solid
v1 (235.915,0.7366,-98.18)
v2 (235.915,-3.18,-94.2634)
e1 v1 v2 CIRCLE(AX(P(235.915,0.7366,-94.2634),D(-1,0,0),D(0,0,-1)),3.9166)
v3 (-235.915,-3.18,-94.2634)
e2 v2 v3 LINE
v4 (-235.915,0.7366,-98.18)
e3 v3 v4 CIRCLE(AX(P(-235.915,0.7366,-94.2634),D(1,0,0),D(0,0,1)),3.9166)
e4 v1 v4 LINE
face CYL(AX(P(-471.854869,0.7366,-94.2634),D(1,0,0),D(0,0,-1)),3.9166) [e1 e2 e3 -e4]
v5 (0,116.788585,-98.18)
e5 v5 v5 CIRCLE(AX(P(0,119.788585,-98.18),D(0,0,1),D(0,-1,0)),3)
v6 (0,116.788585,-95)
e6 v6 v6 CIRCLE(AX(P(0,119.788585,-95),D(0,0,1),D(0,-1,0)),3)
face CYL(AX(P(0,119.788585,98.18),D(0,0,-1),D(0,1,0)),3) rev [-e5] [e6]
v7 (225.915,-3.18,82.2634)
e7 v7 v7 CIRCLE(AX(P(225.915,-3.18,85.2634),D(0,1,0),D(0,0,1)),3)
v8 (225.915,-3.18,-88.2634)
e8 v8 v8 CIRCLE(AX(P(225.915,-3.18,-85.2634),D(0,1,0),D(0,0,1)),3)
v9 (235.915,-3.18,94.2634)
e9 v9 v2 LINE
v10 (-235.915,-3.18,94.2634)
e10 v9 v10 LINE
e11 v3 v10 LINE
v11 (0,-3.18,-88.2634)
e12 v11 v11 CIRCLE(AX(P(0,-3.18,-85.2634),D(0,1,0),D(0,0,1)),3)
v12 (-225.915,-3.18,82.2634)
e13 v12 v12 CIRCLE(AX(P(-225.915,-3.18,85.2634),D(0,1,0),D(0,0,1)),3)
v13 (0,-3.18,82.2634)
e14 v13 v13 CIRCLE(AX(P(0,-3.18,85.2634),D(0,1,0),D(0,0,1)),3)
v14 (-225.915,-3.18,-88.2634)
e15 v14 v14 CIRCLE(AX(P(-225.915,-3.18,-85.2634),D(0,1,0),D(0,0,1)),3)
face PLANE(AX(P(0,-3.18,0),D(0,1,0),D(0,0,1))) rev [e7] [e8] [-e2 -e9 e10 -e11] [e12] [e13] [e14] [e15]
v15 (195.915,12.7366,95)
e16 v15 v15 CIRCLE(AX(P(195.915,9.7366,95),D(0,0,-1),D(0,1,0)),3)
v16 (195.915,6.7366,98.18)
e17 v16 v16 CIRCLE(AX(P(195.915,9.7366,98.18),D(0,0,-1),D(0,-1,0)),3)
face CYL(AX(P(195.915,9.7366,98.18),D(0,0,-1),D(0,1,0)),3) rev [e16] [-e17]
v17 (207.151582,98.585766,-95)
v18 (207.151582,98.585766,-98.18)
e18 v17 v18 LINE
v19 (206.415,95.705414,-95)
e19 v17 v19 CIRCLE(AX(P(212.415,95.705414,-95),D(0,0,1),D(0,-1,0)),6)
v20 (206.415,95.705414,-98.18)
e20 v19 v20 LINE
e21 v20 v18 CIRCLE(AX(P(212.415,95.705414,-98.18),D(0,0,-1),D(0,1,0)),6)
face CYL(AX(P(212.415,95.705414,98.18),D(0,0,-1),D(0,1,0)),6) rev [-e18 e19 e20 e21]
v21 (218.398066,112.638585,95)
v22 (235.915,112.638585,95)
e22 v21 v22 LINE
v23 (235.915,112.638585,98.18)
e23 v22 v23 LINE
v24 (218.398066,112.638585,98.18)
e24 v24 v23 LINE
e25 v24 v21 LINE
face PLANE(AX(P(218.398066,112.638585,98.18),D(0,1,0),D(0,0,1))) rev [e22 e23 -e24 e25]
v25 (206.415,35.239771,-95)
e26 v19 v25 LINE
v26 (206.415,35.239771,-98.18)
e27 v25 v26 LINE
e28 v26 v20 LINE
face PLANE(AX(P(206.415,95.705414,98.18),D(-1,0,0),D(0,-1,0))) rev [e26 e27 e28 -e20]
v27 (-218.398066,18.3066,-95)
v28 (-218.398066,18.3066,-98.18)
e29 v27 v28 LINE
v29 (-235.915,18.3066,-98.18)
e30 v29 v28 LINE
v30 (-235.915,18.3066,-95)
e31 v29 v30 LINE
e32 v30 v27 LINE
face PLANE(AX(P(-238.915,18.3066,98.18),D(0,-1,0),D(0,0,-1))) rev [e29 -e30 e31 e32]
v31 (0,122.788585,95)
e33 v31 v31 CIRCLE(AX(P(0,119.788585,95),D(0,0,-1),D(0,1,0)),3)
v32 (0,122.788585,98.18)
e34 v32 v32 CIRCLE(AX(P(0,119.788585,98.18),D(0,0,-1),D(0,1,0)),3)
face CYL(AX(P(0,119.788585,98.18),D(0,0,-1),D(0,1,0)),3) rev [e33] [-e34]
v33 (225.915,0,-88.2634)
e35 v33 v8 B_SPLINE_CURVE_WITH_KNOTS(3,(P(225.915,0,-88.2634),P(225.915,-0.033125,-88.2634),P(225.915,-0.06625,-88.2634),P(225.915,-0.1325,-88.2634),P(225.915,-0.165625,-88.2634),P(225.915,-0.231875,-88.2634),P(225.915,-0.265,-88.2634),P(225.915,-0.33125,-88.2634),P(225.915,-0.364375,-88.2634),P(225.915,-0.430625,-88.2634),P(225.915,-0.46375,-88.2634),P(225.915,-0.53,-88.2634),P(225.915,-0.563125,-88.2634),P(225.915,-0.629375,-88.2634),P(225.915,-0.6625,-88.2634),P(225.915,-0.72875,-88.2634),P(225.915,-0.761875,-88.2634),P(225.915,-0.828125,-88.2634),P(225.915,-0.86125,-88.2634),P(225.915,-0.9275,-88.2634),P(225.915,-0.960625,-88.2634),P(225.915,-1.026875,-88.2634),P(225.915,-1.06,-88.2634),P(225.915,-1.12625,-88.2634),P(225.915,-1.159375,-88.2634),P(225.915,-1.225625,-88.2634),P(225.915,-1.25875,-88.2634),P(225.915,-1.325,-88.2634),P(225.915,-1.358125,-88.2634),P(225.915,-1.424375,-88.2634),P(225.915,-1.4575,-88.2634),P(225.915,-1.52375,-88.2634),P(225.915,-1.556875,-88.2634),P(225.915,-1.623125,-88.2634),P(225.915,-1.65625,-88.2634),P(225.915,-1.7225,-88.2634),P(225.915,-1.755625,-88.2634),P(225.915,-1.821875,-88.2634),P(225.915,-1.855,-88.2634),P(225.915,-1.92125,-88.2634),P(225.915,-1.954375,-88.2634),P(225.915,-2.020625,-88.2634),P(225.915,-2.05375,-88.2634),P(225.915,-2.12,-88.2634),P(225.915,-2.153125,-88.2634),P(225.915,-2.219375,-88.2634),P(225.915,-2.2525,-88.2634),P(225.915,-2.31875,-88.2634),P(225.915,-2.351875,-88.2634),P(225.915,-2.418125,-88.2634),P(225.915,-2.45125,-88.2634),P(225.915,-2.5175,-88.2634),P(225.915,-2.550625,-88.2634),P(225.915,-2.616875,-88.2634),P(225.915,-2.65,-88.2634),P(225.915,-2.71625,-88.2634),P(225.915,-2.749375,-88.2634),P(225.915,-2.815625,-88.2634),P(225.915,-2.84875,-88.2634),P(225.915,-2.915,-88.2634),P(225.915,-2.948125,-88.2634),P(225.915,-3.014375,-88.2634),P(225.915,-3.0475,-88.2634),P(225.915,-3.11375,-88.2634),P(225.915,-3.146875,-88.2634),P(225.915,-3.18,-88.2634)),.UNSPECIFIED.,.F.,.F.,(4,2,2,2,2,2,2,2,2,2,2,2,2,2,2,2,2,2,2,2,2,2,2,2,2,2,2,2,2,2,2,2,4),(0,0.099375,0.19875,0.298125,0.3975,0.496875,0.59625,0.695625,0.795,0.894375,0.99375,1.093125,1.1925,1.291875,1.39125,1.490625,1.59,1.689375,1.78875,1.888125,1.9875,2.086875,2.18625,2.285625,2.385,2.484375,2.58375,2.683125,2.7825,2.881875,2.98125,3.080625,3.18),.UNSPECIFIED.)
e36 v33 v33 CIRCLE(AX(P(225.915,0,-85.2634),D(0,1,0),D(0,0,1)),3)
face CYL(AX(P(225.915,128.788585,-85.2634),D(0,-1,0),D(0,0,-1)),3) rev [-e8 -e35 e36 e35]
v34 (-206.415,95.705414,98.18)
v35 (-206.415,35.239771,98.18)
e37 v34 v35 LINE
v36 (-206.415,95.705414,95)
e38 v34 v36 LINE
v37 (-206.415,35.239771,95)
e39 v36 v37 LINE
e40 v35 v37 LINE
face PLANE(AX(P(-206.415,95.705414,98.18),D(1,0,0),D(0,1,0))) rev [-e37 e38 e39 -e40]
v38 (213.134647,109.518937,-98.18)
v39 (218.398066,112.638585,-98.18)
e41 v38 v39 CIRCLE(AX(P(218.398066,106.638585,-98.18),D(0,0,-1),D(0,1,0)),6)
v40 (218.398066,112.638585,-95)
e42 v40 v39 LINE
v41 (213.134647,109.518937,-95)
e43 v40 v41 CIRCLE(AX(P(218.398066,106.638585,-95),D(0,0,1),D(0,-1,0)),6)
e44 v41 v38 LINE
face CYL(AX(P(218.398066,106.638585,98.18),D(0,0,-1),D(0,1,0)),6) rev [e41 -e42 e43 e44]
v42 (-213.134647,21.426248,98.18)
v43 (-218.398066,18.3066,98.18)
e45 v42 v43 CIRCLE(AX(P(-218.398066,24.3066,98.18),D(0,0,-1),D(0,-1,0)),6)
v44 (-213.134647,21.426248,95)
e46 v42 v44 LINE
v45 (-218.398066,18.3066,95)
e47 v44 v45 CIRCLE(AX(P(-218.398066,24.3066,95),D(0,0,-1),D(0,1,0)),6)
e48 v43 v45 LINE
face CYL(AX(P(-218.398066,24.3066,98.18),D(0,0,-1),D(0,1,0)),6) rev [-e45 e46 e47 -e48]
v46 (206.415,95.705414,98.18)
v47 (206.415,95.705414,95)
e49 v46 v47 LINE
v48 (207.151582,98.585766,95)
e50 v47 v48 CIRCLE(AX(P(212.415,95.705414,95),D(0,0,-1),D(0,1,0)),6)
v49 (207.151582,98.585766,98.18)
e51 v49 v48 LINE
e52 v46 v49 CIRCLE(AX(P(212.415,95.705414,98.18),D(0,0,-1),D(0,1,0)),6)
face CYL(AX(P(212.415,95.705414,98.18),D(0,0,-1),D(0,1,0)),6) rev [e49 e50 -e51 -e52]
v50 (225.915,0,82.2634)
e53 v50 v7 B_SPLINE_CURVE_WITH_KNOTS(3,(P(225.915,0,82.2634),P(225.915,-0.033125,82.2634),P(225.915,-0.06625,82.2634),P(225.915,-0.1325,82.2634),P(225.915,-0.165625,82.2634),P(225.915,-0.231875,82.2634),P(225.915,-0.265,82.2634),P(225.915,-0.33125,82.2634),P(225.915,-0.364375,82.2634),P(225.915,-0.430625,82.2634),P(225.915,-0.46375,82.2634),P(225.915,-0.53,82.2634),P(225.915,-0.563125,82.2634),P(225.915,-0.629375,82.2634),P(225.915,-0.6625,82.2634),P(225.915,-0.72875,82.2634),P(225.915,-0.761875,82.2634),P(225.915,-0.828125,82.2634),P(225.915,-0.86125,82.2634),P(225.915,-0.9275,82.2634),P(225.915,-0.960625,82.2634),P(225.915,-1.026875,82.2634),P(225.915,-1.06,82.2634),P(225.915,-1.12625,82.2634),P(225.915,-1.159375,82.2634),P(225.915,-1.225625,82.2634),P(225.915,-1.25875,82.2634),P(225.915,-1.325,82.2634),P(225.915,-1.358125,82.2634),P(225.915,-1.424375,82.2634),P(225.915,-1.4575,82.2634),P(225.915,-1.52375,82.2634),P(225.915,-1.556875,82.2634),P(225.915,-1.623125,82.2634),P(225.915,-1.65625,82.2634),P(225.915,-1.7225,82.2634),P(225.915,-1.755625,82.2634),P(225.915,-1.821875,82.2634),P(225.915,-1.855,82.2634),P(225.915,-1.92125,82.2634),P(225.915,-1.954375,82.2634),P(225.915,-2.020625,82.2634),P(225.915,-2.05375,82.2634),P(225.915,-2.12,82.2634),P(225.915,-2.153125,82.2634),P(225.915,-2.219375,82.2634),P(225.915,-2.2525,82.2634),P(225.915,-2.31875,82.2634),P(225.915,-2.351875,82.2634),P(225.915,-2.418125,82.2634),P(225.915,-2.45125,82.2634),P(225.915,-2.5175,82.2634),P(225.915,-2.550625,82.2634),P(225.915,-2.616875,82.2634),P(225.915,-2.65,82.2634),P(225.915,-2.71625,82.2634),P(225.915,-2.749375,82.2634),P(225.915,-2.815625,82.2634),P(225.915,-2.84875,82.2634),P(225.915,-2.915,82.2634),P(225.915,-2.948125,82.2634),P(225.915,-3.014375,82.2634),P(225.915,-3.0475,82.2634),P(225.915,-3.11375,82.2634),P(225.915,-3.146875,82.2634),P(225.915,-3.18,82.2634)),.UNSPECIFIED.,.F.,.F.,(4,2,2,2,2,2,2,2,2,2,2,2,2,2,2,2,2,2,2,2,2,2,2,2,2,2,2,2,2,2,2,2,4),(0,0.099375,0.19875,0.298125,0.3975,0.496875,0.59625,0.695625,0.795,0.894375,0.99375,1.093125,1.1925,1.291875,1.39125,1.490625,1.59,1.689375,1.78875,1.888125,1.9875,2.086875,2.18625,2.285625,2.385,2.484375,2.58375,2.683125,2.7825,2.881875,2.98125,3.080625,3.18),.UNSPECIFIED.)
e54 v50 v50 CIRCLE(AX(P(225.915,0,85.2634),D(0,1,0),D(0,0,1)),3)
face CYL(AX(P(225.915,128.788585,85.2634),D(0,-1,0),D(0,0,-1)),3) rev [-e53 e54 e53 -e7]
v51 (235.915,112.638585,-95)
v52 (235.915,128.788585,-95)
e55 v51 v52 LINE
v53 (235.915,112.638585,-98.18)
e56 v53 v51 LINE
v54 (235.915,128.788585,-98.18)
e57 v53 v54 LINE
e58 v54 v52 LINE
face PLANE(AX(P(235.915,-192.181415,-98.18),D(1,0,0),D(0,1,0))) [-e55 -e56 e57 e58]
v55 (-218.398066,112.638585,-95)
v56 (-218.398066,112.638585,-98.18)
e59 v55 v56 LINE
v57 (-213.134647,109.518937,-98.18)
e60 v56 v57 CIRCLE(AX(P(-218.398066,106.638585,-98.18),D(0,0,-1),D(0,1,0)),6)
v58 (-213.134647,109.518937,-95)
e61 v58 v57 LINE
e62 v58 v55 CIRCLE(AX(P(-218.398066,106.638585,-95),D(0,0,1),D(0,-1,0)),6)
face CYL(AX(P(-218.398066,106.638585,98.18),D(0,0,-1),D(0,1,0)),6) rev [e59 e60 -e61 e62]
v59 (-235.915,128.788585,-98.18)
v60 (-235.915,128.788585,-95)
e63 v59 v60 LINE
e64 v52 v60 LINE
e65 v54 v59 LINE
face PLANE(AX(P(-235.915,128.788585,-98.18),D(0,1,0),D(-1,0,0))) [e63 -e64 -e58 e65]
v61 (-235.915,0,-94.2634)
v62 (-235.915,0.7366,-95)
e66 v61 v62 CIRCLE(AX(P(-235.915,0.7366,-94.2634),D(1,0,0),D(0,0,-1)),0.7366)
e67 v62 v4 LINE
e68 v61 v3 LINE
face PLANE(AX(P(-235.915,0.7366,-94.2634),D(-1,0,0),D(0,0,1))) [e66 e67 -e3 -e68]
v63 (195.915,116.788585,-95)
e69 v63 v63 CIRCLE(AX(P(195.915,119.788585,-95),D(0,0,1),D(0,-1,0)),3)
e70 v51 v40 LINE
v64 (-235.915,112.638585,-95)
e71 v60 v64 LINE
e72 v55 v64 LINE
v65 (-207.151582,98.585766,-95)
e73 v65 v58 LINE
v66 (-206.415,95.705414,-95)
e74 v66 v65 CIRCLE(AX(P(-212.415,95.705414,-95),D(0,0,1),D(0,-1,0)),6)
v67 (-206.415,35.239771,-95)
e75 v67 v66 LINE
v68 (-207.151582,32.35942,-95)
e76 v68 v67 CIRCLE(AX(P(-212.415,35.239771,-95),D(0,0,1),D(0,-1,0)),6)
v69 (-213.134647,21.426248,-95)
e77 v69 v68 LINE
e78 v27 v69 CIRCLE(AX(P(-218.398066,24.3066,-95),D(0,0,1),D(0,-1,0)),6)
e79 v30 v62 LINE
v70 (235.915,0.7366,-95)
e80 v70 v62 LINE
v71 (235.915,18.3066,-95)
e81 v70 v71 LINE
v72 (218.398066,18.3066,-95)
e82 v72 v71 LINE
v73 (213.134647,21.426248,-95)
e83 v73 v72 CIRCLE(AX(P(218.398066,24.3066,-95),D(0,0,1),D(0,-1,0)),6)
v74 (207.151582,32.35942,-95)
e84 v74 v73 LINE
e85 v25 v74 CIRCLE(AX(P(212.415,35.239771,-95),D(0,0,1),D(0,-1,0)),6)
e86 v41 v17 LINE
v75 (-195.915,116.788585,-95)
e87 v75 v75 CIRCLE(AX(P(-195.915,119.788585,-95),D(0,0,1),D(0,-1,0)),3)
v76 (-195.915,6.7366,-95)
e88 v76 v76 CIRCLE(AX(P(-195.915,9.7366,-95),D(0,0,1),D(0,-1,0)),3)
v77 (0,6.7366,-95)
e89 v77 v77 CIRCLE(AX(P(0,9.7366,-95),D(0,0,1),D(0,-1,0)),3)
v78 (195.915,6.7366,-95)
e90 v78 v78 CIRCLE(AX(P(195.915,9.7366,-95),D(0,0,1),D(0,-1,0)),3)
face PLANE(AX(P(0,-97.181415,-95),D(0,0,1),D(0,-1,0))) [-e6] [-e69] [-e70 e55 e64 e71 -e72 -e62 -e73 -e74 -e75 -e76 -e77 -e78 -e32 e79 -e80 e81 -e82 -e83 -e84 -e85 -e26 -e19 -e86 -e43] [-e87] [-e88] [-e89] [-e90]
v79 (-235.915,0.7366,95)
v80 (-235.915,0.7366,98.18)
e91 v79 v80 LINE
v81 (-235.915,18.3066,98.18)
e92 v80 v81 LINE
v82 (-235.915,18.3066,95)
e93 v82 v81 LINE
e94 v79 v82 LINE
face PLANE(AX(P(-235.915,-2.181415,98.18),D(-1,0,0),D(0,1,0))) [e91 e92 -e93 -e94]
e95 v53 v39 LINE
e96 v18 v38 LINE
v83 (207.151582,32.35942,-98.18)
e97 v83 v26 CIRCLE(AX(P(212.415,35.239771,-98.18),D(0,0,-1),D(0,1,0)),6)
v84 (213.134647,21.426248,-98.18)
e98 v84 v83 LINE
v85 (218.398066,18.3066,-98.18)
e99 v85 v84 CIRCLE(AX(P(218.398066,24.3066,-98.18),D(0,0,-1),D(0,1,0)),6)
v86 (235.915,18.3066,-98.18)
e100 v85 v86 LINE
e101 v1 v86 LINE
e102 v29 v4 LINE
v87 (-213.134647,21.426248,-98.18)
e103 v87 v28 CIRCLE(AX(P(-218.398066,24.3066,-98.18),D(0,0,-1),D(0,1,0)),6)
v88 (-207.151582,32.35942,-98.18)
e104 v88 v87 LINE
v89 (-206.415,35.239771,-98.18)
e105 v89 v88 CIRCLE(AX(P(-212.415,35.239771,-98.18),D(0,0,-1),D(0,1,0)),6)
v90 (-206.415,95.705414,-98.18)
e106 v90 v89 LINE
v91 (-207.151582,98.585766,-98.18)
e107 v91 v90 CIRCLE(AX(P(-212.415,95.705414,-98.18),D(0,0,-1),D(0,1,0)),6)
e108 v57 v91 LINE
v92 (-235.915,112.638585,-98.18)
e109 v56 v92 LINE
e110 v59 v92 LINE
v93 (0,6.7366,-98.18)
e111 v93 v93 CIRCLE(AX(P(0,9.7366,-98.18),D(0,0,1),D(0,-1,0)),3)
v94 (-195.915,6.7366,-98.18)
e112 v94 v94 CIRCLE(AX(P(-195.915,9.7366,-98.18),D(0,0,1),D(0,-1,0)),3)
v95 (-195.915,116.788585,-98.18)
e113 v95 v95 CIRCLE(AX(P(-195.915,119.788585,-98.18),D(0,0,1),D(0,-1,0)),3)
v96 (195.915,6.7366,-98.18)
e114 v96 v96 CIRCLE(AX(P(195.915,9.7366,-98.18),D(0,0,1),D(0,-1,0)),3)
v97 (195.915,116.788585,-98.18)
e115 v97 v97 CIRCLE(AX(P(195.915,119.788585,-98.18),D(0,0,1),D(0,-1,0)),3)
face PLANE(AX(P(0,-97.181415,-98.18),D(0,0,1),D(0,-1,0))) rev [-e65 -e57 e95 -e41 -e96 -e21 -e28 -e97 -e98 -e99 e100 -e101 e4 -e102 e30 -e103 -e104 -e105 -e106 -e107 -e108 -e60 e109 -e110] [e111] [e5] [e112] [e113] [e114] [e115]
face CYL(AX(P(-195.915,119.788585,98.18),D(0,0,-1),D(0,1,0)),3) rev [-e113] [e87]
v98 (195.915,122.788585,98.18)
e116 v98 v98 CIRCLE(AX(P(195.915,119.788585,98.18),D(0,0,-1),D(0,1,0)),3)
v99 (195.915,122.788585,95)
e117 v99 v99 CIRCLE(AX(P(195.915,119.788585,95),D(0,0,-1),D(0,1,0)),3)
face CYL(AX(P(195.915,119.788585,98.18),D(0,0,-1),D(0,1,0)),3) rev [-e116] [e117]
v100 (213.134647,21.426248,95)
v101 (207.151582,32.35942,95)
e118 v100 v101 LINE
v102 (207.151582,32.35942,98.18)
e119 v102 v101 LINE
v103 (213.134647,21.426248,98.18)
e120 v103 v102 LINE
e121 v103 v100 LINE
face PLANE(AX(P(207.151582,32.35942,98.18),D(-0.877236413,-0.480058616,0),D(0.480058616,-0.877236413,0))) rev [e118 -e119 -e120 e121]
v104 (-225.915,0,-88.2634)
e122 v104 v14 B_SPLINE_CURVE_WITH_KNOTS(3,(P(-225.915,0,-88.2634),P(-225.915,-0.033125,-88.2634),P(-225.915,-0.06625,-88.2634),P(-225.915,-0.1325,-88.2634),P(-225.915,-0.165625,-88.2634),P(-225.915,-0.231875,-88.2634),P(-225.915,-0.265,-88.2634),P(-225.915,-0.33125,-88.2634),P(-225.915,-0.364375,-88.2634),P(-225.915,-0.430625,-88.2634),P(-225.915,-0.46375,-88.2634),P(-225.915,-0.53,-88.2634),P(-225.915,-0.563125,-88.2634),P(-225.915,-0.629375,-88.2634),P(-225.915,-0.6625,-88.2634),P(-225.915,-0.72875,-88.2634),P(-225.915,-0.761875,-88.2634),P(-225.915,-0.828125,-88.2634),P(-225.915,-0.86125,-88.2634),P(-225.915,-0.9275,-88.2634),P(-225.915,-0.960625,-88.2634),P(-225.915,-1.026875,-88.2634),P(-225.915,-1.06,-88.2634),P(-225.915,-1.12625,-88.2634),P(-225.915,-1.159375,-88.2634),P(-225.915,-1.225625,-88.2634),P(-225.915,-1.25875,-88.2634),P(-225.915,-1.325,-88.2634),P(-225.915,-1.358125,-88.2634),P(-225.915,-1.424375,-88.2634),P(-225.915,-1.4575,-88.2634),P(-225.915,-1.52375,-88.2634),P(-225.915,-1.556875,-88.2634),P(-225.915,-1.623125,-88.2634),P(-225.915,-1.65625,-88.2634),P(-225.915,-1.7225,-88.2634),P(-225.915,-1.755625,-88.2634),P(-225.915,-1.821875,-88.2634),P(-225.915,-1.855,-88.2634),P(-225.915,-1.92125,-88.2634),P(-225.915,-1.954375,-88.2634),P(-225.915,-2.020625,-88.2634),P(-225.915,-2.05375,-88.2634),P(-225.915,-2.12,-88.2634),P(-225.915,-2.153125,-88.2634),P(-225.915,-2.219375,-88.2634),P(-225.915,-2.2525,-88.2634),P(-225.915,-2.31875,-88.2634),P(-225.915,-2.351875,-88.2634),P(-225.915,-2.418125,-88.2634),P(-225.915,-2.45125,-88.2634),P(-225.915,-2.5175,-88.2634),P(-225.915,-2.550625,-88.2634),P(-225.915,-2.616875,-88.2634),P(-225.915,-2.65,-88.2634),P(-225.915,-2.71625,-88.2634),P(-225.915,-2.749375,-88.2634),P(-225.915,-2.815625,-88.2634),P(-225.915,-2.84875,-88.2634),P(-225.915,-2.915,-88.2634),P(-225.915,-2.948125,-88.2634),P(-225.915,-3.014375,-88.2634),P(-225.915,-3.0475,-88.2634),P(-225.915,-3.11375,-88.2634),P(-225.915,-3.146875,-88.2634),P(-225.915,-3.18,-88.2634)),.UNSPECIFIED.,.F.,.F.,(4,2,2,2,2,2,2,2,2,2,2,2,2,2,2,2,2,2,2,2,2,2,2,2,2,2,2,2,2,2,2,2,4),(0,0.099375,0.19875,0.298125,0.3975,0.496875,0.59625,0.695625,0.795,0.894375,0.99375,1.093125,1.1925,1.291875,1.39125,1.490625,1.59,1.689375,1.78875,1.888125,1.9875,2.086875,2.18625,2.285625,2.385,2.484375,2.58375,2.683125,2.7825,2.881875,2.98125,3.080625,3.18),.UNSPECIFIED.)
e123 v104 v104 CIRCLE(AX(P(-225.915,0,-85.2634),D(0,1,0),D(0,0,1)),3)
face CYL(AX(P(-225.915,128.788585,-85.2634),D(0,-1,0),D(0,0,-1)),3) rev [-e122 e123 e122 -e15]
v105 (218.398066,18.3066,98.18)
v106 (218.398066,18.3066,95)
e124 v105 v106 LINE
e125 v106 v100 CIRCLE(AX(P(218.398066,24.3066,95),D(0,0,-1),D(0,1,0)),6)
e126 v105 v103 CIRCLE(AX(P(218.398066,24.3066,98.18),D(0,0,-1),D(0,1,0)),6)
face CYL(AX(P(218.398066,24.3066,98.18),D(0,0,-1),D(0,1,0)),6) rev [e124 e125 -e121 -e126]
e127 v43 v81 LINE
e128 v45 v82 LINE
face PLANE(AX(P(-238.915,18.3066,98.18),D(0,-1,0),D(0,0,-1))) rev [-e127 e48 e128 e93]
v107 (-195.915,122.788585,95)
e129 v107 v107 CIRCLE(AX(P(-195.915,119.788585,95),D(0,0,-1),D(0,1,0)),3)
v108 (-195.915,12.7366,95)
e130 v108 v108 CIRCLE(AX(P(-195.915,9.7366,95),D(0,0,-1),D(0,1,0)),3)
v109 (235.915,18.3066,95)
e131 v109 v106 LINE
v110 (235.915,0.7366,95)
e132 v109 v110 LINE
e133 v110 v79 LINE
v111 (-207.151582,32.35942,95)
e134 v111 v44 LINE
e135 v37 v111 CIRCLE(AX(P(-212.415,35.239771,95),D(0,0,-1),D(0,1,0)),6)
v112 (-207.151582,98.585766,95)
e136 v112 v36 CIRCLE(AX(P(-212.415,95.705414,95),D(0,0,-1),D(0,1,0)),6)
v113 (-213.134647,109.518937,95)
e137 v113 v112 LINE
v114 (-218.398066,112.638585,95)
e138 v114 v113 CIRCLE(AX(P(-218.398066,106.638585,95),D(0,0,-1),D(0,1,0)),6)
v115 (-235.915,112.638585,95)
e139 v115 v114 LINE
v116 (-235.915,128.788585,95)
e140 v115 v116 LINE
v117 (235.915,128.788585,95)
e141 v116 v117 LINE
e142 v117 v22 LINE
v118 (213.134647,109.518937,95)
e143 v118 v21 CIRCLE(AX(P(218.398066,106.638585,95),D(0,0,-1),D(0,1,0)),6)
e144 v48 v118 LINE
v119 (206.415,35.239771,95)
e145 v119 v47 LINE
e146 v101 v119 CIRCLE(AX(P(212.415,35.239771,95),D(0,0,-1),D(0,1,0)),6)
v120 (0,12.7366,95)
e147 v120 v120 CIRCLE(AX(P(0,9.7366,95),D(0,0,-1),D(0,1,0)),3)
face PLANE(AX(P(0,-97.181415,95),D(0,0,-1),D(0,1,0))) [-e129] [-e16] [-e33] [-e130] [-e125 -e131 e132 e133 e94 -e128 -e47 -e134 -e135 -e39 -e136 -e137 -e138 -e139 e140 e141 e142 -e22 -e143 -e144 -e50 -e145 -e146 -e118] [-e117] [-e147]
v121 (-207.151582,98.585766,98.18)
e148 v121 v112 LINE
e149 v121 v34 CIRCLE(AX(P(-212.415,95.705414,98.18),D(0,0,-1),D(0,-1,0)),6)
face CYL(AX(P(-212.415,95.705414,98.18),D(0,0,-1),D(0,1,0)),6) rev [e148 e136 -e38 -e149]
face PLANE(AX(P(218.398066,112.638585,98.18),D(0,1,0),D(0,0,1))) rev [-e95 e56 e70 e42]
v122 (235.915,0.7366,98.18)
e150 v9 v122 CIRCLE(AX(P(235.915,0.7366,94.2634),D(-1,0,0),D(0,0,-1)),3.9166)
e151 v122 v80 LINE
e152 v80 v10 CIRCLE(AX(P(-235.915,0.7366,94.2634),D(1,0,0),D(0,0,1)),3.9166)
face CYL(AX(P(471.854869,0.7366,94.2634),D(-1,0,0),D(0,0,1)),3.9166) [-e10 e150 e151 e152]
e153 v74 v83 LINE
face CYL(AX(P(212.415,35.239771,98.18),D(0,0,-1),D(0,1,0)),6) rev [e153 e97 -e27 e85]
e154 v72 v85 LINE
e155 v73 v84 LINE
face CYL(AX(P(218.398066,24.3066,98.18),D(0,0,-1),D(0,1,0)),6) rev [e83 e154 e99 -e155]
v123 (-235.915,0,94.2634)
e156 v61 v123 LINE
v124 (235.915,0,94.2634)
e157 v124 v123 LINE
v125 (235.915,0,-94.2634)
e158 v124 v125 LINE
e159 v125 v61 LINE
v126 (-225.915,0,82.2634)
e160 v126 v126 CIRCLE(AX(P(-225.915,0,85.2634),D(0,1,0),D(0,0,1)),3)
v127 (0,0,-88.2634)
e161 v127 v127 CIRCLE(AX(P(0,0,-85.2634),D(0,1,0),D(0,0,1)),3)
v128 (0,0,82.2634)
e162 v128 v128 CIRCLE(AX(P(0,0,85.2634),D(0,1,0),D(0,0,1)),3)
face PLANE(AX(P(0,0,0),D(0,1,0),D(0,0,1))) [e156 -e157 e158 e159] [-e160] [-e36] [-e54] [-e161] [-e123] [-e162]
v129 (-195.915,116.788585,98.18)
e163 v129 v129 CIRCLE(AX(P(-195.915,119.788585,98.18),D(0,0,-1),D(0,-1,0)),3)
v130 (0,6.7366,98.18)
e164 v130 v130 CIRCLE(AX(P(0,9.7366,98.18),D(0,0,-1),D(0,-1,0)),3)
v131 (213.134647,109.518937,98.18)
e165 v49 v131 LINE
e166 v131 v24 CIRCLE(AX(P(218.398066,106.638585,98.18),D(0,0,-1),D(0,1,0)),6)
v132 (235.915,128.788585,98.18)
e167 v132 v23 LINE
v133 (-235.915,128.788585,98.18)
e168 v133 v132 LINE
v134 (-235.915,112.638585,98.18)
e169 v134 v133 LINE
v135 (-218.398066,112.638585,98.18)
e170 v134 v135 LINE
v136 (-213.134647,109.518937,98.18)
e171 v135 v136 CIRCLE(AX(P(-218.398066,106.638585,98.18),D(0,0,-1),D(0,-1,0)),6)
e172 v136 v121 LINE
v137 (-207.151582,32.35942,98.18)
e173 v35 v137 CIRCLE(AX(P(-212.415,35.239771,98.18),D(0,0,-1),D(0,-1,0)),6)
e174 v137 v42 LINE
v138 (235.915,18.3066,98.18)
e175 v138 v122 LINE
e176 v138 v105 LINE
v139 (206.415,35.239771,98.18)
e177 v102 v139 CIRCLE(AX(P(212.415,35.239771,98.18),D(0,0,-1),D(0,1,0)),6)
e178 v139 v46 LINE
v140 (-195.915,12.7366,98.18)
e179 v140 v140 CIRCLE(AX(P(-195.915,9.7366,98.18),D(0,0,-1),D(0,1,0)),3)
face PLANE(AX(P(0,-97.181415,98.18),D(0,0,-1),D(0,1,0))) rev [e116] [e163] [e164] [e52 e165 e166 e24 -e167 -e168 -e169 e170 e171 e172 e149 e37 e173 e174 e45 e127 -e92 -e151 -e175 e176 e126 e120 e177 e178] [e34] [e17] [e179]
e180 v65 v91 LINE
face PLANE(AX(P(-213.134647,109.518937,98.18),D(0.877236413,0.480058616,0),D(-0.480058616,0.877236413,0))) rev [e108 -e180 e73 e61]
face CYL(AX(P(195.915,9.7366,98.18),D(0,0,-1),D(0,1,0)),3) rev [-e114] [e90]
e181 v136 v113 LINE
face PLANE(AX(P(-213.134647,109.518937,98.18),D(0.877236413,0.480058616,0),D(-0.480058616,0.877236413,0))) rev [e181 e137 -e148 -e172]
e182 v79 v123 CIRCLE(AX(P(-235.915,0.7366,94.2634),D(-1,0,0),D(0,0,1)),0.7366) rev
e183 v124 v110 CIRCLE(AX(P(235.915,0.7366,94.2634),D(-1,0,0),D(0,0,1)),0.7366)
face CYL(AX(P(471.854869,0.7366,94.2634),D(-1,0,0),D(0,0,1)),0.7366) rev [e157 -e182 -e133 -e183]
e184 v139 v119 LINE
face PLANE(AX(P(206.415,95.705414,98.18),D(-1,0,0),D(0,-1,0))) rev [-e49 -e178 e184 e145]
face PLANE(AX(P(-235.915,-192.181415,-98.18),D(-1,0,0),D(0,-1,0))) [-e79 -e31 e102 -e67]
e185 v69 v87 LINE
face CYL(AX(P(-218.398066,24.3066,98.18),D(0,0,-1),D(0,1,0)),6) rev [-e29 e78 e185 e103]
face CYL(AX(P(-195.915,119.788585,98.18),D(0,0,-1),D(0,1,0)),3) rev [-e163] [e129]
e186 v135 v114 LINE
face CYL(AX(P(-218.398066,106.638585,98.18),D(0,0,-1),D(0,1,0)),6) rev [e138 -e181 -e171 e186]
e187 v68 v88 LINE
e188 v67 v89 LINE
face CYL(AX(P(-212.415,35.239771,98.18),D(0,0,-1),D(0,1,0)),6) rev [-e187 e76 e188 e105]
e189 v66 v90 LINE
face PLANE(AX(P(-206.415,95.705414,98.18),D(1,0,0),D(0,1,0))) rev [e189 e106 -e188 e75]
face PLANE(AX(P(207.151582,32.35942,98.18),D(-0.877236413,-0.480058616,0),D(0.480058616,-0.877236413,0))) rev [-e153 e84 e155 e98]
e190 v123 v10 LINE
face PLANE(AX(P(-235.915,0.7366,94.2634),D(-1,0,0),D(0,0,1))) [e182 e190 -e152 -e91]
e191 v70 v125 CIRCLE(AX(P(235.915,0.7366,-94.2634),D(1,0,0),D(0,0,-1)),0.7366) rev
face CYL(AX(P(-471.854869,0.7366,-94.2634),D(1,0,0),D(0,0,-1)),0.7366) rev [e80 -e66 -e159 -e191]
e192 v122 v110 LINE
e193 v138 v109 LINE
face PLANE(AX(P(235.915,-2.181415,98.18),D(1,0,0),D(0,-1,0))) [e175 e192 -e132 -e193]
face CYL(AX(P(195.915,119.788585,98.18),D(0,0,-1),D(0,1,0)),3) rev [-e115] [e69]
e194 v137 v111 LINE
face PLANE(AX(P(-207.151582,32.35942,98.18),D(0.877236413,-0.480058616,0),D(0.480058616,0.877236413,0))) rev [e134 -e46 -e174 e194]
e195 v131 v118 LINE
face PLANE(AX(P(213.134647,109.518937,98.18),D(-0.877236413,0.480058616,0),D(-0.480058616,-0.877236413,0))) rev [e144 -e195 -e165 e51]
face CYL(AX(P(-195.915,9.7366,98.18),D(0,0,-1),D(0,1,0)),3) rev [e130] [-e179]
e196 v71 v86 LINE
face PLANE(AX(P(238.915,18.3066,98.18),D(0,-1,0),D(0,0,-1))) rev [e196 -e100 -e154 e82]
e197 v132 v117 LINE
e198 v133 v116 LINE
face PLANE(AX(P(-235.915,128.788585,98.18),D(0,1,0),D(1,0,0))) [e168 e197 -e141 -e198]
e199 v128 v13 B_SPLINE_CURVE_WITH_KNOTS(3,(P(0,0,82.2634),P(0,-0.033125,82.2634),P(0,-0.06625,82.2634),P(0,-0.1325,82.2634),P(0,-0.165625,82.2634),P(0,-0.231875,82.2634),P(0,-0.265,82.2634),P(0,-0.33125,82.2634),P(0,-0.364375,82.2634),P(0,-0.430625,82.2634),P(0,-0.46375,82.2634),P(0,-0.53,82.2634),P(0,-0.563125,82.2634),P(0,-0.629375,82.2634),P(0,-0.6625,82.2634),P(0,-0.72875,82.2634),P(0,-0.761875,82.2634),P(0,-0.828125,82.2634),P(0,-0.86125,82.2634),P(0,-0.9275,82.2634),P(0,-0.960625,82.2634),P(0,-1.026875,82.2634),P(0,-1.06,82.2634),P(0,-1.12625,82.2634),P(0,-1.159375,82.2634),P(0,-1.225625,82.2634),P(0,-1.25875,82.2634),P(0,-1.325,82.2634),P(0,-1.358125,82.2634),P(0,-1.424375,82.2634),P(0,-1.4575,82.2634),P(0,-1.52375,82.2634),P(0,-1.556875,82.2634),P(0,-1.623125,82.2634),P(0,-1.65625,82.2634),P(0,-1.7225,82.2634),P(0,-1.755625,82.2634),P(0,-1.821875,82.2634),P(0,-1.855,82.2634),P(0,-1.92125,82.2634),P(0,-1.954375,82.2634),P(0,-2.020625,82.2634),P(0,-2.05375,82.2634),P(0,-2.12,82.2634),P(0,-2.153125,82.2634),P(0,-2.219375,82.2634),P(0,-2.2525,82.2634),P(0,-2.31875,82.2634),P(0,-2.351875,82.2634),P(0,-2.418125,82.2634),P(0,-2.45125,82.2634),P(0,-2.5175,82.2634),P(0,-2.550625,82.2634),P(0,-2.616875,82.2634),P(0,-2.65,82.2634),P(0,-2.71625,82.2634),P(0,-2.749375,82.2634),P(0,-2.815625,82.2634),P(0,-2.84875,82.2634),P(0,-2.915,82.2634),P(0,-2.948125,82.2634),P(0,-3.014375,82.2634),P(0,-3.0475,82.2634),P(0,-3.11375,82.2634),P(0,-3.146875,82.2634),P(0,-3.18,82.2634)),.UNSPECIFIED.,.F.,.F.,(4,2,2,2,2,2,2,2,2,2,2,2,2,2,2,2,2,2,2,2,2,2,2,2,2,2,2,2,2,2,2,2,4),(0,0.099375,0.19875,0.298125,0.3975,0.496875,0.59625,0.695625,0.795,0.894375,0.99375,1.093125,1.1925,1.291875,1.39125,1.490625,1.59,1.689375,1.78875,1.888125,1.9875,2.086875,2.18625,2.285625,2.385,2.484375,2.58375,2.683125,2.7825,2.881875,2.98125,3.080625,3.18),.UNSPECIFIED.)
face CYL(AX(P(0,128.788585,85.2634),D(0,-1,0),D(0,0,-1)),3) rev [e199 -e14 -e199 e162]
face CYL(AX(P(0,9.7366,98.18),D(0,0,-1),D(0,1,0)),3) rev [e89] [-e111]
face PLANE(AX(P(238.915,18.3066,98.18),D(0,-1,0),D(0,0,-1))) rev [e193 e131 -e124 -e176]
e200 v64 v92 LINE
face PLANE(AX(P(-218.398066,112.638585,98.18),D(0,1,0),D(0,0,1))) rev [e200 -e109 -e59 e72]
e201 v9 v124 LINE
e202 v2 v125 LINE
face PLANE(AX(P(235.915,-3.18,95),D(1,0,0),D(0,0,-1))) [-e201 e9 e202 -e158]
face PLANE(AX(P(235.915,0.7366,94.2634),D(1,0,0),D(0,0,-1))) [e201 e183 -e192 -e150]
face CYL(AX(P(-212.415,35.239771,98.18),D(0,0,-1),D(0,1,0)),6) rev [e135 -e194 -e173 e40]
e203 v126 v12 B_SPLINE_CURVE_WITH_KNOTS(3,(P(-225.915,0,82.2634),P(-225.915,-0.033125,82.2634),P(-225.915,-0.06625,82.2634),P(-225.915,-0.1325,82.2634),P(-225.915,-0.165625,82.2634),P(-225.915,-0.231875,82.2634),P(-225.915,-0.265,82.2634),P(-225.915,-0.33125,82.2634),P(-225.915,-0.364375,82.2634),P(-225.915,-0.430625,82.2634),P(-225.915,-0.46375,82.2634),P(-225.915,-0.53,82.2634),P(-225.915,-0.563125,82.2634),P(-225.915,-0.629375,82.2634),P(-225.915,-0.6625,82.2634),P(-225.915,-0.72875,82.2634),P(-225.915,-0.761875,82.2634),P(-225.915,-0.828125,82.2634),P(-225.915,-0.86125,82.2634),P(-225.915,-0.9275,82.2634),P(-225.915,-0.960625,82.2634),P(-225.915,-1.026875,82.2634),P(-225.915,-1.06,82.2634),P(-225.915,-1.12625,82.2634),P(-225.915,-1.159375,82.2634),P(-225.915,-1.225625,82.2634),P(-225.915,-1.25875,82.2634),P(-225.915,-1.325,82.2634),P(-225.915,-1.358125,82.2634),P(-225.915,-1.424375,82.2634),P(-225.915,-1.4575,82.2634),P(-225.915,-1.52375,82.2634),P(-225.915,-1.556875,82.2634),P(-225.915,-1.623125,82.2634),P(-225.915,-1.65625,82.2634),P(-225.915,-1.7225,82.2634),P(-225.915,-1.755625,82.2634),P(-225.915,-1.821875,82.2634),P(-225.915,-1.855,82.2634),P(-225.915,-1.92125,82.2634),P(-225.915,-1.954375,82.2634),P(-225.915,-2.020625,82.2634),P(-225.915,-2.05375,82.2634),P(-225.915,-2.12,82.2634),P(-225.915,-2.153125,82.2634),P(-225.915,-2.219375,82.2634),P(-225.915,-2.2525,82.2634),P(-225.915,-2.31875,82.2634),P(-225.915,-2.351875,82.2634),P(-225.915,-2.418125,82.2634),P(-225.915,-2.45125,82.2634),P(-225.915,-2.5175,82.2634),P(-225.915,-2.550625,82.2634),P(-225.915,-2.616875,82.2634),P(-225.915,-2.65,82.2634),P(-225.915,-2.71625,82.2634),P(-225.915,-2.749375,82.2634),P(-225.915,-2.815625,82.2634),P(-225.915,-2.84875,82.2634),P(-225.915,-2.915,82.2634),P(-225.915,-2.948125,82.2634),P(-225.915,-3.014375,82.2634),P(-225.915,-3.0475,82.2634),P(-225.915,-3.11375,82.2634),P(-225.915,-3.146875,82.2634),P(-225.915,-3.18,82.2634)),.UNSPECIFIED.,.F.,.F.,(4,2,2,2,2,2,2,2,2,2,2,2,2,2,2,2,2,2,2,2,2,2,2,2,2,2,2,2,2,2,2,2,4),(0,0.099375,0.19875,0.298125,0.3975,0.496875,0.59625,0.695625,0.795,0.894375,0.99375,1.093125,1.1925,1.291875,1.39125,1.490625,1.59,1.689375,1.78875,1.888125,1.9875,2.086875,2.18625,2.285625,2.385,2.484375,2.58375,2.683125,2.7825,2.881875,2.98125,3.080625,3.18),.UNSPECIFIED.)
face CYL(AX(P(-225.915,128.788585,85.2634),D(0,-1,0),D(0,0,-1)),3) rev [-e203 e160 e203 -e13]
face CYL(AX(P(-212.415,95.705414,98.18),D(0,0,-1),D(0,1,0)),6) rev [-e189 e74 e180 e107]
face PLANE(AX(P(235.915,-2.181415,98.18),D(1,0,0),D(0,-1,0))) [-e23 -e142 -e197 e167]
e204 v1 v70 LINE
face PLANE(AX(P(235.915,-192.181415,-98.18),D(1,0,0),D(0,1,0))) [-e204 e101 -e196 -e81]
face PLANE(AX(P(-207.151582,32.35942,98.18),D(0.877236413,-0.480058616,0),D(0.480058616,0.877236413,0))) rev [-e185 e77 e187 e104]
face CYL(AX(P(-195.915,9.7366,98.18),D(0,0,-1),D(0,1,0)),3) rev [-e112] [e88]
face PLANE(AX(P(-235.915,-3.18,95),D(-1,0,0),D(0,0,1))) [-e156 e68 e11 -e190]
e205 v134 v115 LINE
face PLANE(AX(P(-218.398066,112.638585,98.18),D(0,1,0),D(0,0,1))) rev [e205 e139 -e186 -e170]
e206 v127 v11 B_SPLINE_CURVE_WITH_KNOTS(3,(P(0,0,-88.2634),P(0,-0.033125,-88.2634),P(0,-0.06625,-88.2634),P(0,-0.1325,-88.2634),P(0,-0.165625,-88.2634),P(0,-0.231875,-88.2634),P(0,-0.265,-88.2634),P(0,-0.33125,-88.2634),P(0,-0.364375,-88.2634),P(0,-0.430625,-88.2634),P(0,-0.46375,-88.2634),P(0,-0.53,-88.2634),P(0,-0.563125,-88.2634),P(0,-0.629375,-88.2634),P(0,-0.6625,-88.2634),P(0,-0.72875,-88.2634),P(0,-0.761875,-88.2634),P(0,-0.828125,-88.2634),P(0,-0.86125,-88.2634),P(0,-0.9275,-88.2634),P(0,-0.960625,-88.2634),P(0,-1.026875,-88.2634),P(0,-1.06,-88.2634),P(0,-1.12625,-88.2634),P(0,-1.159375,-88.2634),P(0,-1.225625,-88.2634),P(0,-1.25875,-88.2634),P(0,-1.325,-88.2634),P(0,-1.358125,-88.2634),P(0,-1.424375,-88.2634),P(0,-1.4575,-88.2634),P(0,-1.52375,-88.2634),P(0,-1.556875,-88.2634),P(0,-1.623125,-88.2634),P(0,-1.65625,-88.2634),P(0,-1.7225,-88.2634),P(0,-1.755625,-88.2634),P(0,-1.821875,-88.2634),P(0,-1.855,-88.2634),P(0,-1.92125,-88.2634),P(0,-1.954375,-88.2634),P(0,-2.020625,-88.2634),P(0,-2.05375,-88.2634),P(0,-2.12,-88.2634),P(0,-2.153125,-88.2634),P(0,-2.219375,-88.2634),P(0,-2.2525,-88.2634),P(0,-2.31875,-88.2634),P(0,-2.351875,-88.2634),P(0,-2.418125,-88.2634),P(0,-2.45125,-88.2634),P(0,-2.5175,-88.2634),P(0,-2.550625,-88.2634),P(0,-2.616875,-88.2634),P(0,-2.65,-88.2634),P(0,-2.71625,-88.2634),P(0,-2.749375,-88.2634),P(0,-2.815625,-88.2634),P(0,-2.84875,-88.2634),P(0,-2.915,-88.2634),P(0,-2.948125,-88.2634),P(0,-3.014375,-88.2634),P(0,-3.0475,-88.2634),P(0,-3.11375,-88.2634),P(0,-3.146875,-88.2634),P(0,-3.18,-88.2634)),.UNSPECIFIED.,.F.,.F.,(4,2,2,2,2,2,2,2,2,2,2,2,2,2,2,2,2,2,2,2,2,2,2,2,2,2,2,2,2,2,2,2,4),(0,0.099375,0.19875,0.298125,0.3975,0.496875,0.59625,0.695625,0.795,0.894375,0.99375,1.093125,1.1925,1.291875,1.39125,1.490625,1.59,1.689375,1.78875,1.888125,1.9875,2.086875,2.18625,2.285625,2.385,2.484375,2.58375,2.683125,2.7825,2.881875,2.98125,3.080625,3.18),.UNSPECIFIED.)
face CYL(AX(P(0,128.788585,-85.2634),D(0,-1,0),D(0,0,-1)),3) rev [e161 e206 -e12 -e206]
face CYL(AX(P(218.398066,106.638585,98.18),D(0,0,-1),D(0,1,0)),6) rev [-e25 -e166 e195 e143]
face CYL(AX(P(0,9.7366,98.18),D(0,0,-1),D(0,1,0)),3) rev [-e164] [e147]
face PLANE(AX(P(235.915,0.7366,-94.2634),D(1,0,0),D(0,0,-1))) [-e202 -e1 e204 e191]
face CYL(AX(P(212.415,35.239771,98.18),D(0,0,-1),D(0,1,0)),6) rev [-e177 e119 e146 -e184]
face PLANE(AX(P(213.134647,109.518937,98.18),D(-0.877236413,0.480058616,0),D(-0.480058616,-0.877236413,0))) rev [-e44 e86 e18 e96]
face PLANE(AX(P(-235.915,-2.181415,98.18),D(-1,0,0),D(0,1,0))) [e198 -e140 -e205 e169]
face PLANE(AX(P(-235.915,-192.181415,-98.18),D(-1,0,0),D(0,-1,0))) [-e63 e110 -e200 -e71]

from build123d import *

# Parameters (mm, degrees)
BASE_FLANGE2_DEPTH      = 3.18
SKETCHED_START          = -235.915
SKETCHED_BEND1_DEPTH    = 471.83
SKETCHED_BEND1_2_DEPTH  = 471.83
CUT_EXTRUDE1_DEPTH      = 333.865793556
CUT_EXTRUDE1_DEPTH_BACK = 333.865793556
CUT_EXTRUDE2_DEPTH      = 333.865793556
CUT_EXTRUDE2_DEPTH_BACK = 333.865793556
SKETCH13_R              = 3
CUT_EXTRUDE3_DEPTH      = 288.595040156
CUT_EXTRUDE3_DEPTH_BACK = 288.595040156
SKETCH14_R              = 3


# Read off the part's stored shape, not the designer's step: Sketched Bend1
# Sheet-metal steps are written as plain solids
with BuildPart() as part:
    # Sketch1 → Base-Flange2 (new body)
    with BuildSketch(Plane(origin=(0, 0, 0), x_dir=(1, 0, 0), z_dir=(0, 1, 0))):
        Polygon((-235.915, -95), (-235.915, -225.97), (235.915, -225.97), (235.915, -95), (235.915, 95), (235.915, 225.97), (-235.915, 225.97), (-235.915, 95), align=None)
    extrude(amount=-BASE_FLANGE2_DEPTH)

    # Sketched Bend1 outline → Sketched Bend1 (cut)
    with BuildSketch(Plane.YZ.offset(SKETCHED_START)):
        with BuildLine():
            ThreePointArc((0, -98.110109763), (-2.282068839, -96.758874704), (-3.18, -94.2634))
            Line((-3.18, -94.2634), (-3.18, -225.97))
            Line((-3.18, -225.97), (0, -225.97))
            Line((0, -225.97), (0, -98.110109763))
        make_face()
        with BuildLine():
            Line((-3.18, 225.97), (-3.18, 94.2634))
            ThreePointArc((-3.18, 94.2634), (-2.282068839, 96.758874704), (0, 98.110109763))
            Line((0, 98.110109763), (0, 225.97))
            Line((0, 225.97), (-3.18, 225.97))
        make_face()
    extrude(amount=SKETCHED_BEND1_DEPTH, mode=Mode.SUBTRACT)

    # Sketched Bend1 2 outline → Sketched Bend1 2 (add)
    with BuildSketch(Plane.YZ.offset(SKETCHED_START)):
        with BuildLine():
            Line((0, -94.2634), (0, -98.110109763))
            ThreePointArc((0, -98.110109763), (0.366645879, -98.162488292), (0.7366, -98.18))
            Line((0.7366, -98.18), (128.788585266, -98.18))
            Line((128.788585266, -98.18), (128.788585266, -95))
            Line((128.788585266, -95), (0.7366, -95))
            ThreePointArc((0.7366, -95), (0.215745145, -94.784254855), (0, -94.2634))
        make_face()
        with BuildLine():
            ThreePointArc((0.7366, 98.18), (0.366645879, 98.162488292), (0, 98.110109763))
            Line((0, 98.110109763), (0, 94.2634))
            ThreePointArc((0, 94.2634), (0.215745145, 94.784254855), (0.7366, 95))
            Line((0.7366, 95), (128.788585266, 95))
            Line((128.788585266, 95), (128.788585266, 98.18))
            Line((128.788585266, 98.18), (0.7366, 98.18))
        make_face()
    extrude(amount=SKETCHED_BEND1_2_DEPTH)

    # Sketch11 → Cut-Extrude1 (cut, two sides: drawn at the far end of the back side and taken through both)
    with BuildSketch(Plane(origin=(0, 0, -98.18), x_dir=(-1, 0, 0), z_dir=(0, 0, -1)).offset(-CUT_EXTRUDE1_DEPTH_BACK)):
        with BuildLine():
            Line((-238.915, 18.3066), (-218.398065726, 18.3066))
            ThreePointArc((-218.398065726, 18.3066), (-215.338826457, 19.14510263), (-213.134647247, 21.426248301))
            Line((-213.134647247, 21.426248301), (-207.15158152, 32.359419665))
            ThreePointArc((-207.15158152, 32.359419665), (-206.602061377, 33.753250405), (-206.415, 35.239771364))
            Line((-206.415, 35.239771364), (-206.415, 95.705413902))
            ThreePointArc((-206.415, 95.705413902), (-206.602061377, 97.191934861), (-207.15158152, 98.585765601))
            Line((-207.15158152, 98.585765601), (-213.134647247, 109.518936965))
            ThreePointArc((-213.134647247, 109.518936965), (-215.338826457, 111.800082636), (-218.398065726, 112.638585266))
            Line((-218.398065726, 112.638585266), (-238.915, 112.638585266))
            Line((-238.915, 112.638585266), (-238.915, 18.3066))
        make_face()
        with BuildLine():
            Line((218.398065726, 112.638585266), (238.915, 112.638585266))
            Line((238.915, 112.638585266), (238.915, 18.3066))
            Line((238.915, 18.3066), (218.398065726, 18.3066))
            ThreePointArc((218.398065726, 18.3066), (215.338826457, 19.14510263), (213.134647247, 21.426248301))
            Line((213.134647247, 21.426248301), (207.15158152, 32.359419665))
            ThreePointArc((207.15158152, 32.359419665), (206.602061377, 33.753250405), (206.415, 35.239771364))
            Line((206.415, 35.239771364), (206.415, 95.705413902))
            ThreePointArc((206.415, 95.705413902), (206.602061377, 97.191934861), (207.15158152, 98.585765601))
            Line((207.15158152, 98.585765601), (213.134647247, 109.518936965))
            ThreePointArc((213.134647247, 109.518936965), (215.338826457, 111.800082636), (218.398065726, 112.638585266))
        make_face()
    extrude(amount=CUT_EXTRUDE1_DEPTH + CUT_EXTRUDE1_DEPTH_BACK, mode=Mode.SUBTRACT)

    # Sketch13 → Cut-Extrude2 (cut, two sides: drawn at the far end of the back side and taken through both)
    with BuildSketch(Plane(origin=(0, 0, -98.18), x_dir=(-1, 0, 0), z_dir=(0, 0, -1)).offset(-CUT_EXTRUDE2_DEPTH_BACK)):
        with Locations(Location((-195.915, 119.788585266, 0), (0, 0, 90))):
            Circle(SKETCH13_R)
        with Locations(Location((-195.915, 9.7366, 0), (0, 0, 90))):
            Circle(SKETCH13_R)
        with Locations(Location((195.915, 9.7366, 0), (0, 0, 90))):
            Circle(SKETCH13_R)
        with Locations(Location((195.915, 119.788585266, 0), (0, 0, 90))):
            Circle(SKETCH13_R)
        with Locations(Location((0, 119.788585266, 0), (0, 0, 90))):
            Circle(SKETCH13_R)
        with Locations(Location((0, 9.7366, 0), (0, 0, 90))):
            Circle(SKETCH13_R)
    extrude(amount=CUT_EXTRUDE2_DEPTH + CUT_EXTRUDE2_DEPTH_BACK, mode=Mode.SUBTRACT)

    # Sketch14 → Cut-Extrude3 (cut, two sides: drawn at the far end of the back side and taken through both)
    with BuildSketch(Plane.XZ.offset(3.18).offset(-CUT_EXTRUDE3_DEPTH_BACK)):
        with Locations(Location((-225.915, 85.2634, 0), (0, 0, 270))):
            Circle(SKETCH14_R)
        with Locations(Location((-225.915, -85.2634, 0), (0, 0, 270))):
            Circle(SKETCH14_R)
        with Locations(Location((225.915, -85.2634, 0), (0, 0, 270))):
            Circle(SKETCH14_R)
        with Locations(Location((225.915, 85.2634, 0), (0, 0, 270))):
            Circle(SKETCH14_R)
        with Locations(Location((0, 85.2634, 0), (0, 0, 270))):
            Circle(SKETCH14_R)
        with Locations(Location((0, -85.2634, 0), (0, 0, 270))):
            Circle(SKETCH14_R)
    extrude(amount=CUT_EXTRUDE3_DEPTH + CUT_EXTRUDE3_DEPTH_BACK, mode=Mode.SUBTRACT)


solid = part.part
